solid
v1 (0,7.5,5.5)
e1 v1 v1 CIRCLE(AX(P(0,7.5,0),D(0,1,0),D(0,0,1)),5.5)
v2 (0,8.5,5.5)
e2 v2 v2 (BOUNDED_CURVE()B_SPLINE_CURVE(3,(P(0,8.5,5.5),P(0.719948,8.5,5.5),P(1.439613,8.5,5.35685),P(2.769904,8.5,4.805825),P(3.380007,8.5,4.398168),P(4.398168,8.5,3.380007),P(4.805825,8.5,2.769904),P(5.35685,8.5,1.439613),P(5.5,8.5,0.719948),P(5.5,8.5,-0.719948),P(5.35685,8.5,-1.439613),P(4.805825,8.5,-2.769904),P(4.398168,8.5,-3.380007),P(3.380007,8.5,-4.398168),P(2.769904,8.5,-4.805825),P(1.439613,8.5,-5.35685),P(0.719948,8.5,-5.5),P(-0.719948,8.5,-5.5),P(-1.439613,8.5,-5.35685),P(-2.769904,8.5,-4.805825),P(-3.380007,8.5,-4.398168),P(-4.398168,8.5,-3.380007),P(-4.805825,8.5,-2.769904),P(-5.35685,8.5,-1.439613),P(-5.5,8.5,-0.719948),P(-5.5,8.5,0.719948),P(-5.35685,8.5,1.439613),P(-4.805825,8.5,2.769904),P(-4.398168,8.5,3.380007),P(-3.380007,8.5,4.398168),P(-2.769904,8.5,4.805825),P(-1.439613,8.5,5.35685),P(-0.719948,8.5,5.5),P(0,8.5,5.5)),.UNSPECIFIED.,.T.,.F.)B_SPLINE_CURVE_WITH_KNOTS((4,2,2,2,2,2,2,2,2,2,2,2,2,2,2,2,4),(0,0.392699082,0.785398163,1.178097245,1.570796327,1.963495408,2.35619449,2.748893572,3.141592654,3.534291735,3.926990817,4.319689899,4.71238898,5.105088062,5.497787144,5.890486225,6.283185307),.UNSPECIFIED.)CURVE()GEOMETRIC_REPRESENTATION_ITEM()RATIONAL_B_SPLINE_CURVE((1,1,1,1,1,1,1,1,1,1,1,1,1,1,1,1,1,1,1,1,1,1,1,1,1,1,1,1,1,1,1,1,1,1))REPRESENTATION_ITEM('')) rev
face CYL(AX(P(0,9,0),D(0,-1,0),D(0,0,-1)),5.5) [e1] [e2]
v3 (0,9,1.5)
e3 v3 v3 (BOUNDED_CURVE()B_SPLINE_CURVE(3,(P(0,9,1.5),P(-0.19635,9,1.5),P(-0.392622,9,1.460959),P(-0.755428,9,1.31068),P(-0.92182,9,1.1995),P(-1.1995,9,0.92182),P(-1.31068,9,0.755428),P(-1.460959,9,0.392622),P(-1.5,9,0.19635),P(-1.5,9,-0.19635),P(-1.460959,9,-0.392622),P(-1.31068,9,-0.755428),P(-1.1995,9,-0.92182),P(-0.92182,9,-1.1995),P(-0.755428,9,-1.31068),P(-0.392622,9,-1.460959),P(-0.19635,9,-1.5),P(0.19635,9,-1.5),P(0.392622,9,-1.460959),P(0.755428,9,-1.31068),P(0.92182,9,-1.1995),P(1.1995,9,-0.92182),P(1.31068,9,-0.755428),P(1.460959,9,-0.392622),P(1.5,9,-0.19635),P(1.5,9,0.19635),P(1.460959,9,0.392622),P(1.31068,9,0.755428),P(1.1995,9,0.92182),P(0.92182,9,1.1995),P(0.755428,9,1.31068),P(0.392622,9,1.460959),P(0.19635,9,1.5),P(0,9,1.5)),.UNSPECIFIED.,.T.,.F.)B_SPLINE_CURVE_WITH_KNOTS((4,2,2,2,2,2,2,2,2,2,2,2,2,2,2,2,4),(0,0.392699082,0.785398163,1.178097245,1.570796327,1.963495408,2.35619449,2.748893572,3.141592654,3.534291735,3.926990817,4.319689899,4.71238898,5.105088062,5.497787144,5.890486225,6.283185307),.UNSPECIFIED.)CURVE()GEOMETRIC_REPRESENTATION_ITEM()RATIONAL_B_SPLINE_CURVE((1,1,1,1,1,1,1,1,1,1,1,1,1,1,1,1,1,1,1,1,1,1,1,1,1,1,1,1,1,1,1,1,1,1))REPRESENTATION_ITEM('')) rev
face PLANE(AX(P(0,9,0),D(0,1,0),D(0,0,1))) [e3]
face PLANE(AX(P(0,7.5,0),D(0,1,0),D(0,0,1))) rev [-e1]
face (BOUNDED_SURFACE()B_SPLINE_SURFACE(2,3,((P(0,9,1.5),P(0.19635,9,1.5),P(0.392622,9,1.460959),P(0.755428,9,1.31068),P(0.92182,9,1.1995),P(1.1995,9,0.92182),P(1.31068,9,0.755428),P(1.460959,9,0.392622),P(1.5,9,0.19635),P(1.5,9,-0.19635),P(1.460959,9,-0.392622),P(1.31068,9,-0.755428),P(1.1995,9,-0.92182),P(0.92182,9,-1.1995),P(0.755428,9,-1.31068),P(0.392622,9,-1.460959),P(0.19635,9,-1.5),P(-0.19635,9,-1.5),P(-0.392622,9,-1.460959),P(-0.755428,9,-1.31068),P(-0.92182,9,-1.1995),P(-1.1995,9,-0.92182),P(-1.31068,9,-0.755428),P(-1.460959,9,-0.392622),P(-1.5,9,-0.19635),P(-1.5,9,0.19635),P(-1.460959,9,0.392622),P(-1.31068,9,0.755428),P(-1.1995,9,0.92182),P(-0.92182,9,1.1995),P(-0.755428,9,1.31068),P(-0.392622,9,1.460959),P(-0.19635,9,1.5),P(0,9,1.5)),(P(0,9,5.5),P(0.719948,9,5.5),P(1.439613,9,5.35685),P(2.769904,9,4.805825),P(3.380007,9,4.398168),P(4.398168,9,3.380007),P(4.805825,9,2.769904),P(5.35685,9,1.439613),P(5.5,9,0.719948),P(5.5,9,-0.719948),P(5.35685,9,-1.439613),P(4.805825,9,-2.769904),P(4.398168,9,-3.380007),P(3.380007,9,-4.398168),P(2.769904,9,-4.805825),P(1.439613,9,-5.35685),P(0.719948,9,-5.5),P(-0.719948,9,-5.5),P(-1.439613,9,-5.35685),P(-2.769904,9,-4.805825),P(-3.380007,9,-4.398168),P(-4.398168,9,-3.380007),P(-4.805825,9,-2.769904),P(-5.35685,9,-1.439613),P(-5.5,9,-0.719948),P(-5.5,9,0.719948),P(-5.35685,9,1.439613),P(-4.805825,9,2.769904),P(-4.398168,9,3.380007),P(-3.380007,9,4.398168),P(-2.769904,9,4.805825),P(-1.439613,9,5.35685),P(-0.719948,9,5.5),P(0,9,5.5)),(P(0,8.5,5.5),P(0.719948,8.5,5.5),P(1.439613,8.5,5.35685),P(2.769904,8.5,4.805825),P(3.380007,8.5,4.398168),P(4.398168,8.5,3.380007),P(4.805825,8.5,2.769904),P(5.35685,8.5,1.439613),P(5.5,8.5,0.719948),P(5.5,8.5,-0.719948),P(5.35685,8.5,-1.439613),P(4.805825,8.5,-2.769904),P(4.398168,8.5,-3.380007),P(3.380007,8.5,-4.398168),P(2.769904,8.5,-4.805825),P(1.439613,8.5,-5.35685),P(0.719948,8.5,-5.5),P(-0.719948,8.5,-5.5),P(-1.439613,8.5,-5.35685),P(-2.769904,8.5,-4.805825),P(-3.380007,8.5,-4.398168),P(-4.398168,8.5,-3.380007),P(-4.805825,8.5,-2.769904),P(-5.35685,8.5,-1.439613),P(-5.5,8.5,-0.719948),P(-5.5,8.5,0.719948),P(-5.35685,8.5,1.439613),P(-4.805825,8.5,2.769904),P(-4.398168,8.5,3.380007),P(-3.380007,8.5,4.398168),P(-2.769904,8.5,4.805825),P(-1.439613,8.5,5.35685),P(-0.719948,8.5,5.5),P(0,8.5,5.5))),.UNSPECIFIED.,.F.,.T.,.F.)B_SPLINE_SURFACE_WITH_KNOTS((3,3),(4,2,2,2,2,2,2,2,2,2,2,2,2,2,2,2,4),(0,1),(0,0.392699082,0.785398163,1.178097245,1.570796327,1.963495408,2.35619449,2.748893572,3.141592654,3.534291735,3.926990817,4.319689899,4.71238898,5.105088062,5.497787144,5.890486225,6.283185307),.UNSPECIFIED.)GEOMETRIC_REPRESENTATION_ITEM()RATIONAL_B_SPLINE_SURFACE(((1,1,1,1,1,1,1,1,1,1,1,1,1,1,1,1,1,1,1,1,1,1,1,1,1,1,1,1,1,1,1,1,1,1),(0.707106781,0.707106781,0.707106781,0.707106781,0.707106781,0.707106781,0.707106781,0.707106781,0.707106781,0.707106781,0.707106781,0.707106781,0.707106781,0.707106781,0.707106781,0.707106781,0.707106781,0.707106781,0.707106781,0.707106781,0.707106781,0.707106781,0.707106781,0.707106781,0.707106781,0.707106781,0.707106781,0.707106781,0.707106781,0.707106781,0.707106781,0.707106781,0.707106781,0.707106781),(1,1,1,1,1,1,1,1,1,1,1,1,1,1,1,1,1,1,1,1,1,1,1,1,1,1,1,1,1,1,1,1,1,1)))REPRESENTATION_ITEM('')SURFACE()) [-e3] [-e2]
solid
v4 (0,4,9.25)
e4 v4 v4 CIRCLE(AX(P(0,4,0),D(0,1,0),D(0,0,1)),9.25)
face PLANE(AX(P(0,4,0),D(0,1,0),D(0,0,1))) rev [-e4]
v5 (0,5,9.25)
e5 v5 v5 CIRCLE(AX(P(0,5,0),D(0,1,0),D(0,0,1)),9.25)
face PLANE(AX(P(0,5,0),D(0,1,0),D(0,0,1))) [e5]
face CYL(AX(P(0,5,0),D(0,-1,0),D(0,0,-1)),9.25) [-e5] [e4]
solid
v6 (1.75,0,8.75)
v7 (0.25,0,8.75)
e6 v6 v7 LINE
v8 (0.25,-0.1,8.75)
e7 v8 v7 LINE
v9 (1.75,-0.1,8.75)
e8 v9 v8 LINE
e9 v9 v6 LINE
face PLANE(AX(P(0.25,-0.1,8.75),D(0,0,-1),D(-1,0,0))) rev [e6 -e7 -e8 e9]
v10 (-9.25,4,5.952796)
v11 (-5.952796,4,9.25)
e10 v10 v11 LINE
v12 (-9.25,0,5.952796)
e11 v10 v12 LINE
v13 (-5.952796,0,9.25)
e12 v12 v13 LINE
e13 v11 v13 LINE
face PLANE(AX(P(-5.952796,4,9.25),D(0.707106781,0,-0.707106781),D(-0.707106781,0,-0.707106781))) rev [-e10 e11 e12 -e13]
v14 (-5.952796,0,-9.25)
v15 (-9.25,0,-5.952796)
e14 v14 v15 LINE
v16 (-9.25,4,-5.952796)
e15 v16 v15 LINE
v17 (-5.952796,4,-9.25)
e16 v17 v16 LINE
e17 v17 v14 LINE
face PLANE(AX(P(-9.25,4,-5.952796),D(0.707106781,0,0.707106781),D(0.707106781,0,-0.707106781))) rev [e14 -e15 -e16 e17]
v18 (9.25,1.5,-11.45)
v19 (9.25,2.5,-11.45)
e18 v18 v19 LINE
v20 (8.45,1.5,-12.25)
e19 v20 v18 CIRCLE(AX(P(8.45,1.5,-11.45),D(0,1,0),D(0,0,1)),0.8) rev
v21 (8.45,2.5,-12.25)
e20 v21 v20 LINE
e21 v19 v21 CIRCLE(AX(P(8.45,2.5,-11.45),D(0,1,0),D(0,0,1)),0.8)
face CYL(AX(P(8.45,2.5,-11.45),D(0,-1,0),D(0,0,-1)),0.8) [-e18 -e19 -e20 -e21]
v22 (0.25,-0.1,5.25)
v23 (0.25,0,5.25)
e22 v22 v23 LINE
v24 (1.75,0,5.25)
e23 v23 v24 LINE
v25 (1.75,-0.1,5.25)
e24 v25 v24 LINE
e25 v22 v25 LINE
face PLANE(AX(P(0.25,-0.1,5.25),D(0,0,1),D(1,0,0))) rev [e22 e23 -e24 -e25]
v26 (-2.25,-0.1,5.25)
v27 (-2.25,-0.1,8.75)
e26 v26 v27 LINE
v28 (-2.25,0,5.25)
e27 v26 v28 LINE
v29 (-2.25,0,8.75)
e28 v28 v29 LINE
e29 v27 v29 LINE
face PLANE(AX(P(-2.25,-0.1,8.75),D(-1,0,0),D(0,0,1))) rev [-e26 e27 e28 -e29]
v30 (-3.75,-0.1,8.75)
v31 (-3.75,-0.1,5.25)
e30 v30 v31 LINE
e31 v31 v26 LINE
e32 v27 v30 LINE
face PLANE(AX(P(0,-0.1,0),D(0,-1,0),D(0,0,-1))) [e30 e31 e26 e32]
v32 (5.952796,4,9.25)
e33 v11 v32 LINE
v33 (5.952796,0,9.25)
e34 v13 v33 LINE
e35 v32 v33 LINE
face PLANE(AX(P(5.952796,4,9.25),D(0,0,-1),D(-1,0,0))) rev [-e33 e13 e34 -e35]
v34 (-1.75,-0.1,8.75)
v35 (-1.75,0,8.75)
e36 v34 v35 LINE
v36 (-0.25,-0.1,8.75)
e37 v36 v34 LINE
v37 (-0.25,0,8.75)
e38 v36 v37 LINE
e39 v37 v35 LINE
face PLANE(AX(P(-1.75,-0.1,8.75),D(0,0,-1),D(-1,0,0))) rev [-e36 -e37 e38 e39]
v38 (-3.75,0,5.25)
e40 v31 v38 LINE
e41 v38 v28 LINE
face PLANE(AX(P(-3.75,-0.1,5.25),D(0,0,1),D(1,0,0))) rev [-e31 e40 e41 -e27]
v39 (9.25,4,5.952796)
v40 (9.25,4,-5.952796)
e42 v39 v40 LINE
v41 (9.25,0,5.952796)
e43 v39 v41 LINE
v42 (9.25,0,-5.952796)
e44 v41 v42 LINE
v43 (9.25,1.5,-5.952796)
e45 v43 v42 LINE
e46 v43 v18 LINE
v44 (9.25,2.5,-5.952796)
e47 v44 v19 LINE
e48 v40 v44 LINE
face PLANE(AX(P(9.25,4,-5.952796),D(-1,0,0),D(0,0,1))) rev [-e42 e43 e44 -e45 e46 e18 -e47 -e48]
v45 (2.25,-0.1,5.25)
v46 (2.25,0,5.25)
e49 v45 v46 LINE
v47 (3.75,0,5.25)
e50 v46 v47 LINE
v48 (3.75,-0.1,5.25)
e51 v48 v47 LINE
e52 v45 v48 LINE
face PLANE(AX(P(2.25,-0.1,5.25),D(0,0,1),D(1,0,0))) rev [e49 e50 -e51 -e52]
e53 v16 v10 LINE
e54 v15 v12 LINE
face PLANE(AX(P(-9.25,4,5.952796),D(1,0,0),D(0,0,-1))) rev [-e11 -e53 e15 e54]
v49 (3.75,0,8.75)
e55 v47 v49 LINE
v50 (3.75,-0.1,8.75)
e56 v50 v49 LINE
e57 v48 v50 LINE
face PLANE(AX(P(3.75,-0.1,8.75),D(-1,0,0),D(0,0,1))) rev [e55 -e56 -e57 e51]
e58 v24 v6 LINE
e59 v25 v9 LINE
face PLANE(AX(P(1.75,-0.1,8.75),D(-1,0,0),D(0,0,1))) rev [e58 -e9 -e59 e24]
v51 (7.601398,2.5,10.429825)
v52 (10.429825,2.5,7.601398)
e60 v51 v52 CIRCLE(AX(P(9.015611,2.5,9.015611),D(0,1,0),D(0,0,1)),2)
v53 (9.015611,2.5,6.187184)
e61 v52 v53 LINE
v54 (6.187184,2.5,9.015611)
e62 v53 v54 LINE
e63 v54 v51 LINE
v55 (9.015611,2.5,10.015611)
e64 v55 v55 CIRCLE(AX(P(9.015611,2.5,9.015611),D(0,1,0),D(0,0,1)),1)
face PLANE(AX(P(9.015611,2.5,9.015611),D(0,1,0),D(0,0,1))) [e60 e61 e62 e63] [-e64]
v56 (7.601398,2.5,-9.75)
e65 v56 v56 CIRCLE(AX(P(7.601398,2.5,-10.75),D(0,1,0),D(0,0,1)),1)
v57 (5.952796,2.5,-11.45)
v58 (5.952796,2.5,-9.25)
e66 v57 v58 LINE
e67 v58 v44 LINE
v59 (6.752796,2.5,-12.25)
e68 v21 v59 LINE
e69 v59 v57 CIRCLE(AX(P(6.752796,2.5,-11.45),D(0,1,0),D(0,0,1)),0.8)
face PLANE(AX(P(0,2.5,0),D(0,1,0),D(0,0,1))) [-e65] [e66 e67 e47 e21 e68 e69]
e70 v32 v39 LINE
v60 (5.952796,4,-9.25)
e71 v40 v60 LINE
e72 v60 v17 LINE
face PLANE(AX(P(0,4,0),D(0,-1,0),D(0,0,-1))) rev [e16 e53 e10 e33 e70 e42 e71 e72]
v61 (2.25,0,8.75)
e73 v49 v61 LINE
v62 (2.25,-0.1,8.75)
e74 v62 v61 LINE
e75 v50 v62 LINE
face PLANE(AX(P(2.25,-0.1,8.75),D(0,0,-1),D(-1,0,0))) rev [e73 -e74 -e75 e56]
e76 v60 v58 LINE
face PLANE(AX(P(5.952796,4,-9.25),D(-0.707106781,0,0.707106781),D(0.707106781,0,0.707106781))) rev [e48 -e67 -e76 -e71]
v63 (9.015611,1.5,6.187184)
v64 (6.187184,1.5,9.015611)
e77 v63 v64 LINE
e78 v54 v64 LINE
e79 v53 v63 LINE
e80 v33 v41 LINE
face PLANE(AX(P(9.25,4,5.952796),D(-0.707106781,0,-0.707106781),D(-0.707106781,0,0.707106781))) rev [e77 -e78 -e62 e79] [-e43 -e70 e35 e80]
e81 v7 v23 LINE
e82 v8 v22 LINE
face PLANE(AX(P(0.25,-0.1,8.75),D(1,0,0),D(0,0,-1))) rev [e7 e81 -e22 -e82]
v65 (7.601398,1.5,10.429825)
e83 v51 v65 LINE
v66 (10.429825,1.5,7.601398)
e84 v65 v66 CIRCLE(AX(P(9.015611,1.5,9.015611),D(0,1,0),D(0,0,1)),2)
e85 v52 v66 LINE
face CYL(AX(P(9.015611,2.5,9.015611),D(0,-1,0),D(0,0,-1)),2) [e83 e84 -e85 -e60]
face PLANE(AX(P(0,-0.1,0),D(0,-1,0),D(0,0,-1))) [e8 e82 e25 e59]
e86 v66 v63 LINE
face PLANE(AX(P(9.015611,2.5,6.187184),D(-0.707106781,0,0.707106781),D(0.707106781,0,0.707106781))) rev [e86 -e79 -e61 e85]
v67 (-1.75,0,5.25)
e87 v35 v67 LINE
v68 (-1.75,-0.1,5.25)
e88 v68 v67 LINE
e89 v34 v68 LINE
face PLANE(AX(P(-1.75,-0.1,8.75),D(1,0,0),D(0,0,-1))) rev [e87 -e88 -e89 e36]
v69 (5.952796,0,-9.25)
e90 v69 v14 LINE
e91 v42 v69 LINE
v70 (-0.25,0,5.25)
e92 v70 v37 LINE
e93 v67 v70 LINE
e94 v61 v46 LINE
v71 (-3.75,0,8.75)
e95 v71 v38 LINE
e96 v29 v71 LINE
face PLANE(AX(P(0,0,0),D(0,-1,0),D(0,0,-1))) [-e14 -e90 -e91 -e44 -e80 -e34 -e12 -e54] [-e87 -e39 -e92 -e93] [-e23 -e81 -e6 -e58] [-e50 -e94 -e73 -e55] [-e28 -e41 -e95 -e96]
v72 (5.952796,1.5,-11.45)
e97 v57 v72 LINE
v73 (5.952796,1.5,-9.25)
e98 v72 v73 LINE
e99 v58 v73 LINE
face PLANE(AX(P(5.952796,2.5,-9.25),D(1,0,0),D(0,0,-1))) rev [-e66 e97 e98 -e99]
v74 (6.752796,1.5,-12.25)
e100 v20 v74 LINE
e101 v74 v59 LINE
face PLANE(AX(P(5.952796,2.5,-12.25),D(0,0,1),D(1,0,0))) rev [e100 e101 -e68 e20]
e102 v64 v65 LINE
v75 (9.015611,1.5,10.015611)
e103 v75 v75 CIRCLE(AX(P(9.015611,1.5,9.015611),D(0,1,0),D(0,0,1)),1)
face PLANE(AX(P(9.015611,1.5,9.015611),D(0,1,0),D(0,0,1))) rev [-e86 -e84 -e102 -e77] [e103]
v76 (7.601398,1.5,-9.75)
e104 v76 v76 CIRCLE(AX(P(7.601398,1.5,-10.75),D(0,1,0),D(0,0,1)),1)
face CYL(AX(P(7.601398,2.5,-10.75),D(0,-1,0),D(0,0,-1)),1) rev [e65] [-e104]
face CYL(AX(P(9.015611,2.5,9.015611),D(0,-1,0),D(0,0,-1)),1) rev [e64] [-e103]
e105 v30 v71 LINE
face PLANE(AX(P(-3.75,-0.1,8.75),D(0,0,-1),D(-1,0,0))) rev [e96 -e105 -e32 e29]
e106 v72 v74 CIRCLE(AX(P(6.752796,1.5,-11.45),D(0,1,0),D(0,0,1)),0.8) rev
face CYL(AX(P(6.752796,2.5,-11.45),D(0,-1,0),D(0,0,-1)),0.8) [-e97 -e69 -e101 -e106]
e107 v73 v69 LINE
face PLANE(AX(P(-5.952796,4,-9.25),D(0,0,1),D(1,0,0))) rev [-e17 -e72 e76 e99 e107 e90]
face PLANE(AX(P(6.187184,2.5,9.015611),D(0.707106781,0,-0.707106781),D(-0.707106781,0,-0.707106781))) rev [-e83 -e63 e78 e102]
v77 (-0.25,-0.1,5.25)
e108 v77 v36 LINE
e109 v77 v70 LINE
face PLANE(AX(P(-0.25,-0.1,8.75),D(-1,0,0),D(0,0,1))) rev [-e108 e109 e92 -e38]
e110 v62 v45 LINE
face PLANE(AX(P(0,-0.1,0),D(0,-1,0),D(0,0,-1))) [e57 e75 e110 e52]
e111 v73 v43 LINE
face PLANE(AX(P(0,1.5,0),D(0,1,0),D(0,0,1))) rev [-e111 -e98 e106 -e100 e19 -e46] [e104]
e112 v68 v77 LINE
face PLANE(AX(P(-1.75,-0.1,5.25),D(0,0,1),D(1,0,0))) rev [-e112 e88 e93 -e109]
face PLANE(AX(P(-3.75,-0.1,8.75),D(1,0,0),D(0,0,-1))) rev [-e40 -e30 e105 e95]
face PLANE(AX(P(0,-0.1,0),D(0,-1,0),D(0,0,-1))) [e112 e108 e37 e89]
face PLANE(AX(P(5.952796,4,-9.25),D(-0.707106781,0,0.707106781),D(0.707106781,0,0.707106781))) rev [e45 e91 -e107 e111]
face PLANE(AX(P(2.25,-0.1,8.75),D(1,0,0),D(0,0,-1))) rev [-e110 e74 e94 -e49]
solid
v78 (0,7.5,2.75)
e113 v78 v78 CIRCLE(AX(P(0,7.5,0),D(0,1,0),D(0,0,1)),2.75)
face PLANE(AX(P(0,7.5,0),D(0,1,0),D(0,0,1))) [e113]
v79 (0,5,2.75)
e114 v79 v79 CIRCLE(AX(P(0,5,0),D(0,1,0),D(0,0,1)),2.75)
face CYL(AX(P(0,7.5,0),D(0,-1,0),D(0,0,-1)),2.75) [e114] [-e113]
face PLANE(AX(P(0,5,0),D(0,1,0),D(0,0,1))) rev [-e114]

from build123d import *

# Parameters (mm, degrees)
BOSS_EXTRUDE1_DEPTH = 4
SKETCH2_R           = 9.25
BOSS_EXTRUDE2_DEPTH = 1
SKETCH4_R           = 1
BOSS_EXTRUDE3_DEPTH = 1
SKETCH5_R           = 2.75
BOSS_EXTRUDE4_DEPTH = 2.5
SKETCH6_R           = 5.5
BOSS_EXTRUDE5_DEPTH = 1.5
FILLET1_SIZE        = 0.5
FILLET1_SIZE_2      = 4
FILLET2_R           = 0.8
SKETCH7_W           = 1.5
SKETCH7_H           = 3.5
BOSS_EXTRUDE6_DEPTH = 0.1


with BuildPart() as part:
    # Sketch1 → Boss-Extrude1 (new body)
    with BuildSketch(Plane(origin=(0, 0, 0), x_dir=(1, 0, 0), z_dir=(0, 1, 0))):
        Polygon((-5.952795796, 9.25), (5.952795796, 9.25), (9.25, 5.952795796), (9.25, -5.952795796), (5.952795796, -9.25), (-5.952795796, -9.25), (-9.25, -5.952795796), (-9.25, 5.952795796), align=None)
    extrude(amount=BOSS_EXTRUDE1_DEPTH)

    # Sketch4 → Boss-Extrude3 (add)
    # profile 1 of 2: a face of its own
    with BuildSketch(Plane(origin=(0, 1.5, 0), x_dir=(1, 0, 0), z_dir=(0, 1, 0))):
        Polygon((9.25, 5.952795796), (9.25, 12.25), (5.952795796, 12.25), (5.952795796, 9.25), align=None)
        with Locations(Location((7.601397898, 10.75, 0), (0, 0, 270))):
            Circle(SKETCH4_R, mode=Mode.SUBTRACT)
    # profile 2 of 2: a face of its own
    with BuildSketch(Plane(origin=(0, 1.5, 0), x_dir=(1, 0, 0), z_dir=(0, 1, 0))):
        with BuildLine():
            Line((6.187184335, -9.01561146), (7.601397898, -10.429825023))
            ThreePointArc((7.601397898, -10.429825023), (10.429825023, -10.429825023), (10.429825023, -7.601397898))
            Line((10.429825023, -7.601397898), (9.01561146, -6.187184335))
            Line((9.01561146, -6.187184335), (6.187184335, -9.01561146))
        make_face()
        with Locations(Location((9.01561146, -9.01561146, 0), (0, 0, 270))):
            Circle(SKETCH4_R, mode=Mode.SUBTRACT)
    extrude(amount=BOSS_EXTRUDE3_DEPTH)

    # Fillet2
    fillet2_edges = [part.edges().sort_by_distance(p)[0] for p in [
        (9.25, 2, -12.25),
        (5.952795796, 2, -12.25),
    ]]
    fillet(fillet2_edges, radius=FILLET2_R)

    # Sketch7 → Boss-Extrude6 (add)
    with BuildSketch(Plane.XZ):
        with Locations((-3, 7)):
            Rectangle(SKETCH7_W, SKETCH7_H)
        with Locations((-1, 7)):
            Rectangle(SKETCH7_W, SKETCH7_H)
        with Locations((1, 7)):
            Rectangle(SKETCH7_W, SKETCH7_H)
        with Locations((3, 7)):
            Rectangle(SKETCH7_W, SKETCH7_H)
    extrude(amount=BOSS_EXTRUDE6_DEPTH)


with BuildPart() as body_2:
    # Sketch2 → Boss-Extrude2 (new body)
    with BuildSketch(Plane(origin=(0, 4, 0), x_dir=(1, 0, 0), z_dir=(0, 1, 0))):
        with Locations(Location((0, 0, 0), (0, 0, 270))):
            Circle(SKETCH2_R)
    extrude(amount=BOSS_EXTRUDE2_DEPTH)


with BuildPart() as body_3:
    # Sketch5 → Boss-Extrude4 (new body)
    with BuildSketch(Plane(origin=(0, 5, 0), x_dir=(1, 0, 0), z_dir=(0, 1, 0))):
        with Locations(Location((0, 0, 0), (0, 0, 270))):
            Circle(SKETCH5_R)
    extrude(amount=BOSS_EXTRUDE4_DEPTH)


with BuildPart() as body_4:
    # Sketch6 → Boss-Extrude5 (new body)
    with BuildSketch(Plane(origin=(0, 7.5, 0), x_dir=(1, 0, 0), z_dir=(0, 1, 0))):
        with Locations(Location((0, 0, 0), (0, 0, 270))):
            Circle(SKETCH6_R)
    extrude(amount=BOSS_EXTRUDE5_DEPTH)

    # Fillet1
    # an asymmetric fillet: 4, 0.5 mm, written as the material it takes off along each edge
    with BuildSketch(Plane(origin=(0, 9, 0), x_dir=(0, 0, 1), z_dir=(-1, 0, 0))) as fillet1_piece_1:
        with BuildLine():
            Bezier((5.5, -FILLET1_SIZE), (5.5, 0), (5.5 - FILLET1_SIZE_2, 0), weights=[1, 0.707106781, 1])
            Line((5.5 - FILLET1_SIZE_2, 0), (5.5, 0))
            Line((5.5, 0), (5.5, -FILLET1_SIZE))
        make_face()
    revolve(axis=Axis((0, 9, 0), (0, 1, 0)), mode=Mode.SUBTRACT)


solid = Compound([part.part, body_2.part, body_3.part, body_4.part])
